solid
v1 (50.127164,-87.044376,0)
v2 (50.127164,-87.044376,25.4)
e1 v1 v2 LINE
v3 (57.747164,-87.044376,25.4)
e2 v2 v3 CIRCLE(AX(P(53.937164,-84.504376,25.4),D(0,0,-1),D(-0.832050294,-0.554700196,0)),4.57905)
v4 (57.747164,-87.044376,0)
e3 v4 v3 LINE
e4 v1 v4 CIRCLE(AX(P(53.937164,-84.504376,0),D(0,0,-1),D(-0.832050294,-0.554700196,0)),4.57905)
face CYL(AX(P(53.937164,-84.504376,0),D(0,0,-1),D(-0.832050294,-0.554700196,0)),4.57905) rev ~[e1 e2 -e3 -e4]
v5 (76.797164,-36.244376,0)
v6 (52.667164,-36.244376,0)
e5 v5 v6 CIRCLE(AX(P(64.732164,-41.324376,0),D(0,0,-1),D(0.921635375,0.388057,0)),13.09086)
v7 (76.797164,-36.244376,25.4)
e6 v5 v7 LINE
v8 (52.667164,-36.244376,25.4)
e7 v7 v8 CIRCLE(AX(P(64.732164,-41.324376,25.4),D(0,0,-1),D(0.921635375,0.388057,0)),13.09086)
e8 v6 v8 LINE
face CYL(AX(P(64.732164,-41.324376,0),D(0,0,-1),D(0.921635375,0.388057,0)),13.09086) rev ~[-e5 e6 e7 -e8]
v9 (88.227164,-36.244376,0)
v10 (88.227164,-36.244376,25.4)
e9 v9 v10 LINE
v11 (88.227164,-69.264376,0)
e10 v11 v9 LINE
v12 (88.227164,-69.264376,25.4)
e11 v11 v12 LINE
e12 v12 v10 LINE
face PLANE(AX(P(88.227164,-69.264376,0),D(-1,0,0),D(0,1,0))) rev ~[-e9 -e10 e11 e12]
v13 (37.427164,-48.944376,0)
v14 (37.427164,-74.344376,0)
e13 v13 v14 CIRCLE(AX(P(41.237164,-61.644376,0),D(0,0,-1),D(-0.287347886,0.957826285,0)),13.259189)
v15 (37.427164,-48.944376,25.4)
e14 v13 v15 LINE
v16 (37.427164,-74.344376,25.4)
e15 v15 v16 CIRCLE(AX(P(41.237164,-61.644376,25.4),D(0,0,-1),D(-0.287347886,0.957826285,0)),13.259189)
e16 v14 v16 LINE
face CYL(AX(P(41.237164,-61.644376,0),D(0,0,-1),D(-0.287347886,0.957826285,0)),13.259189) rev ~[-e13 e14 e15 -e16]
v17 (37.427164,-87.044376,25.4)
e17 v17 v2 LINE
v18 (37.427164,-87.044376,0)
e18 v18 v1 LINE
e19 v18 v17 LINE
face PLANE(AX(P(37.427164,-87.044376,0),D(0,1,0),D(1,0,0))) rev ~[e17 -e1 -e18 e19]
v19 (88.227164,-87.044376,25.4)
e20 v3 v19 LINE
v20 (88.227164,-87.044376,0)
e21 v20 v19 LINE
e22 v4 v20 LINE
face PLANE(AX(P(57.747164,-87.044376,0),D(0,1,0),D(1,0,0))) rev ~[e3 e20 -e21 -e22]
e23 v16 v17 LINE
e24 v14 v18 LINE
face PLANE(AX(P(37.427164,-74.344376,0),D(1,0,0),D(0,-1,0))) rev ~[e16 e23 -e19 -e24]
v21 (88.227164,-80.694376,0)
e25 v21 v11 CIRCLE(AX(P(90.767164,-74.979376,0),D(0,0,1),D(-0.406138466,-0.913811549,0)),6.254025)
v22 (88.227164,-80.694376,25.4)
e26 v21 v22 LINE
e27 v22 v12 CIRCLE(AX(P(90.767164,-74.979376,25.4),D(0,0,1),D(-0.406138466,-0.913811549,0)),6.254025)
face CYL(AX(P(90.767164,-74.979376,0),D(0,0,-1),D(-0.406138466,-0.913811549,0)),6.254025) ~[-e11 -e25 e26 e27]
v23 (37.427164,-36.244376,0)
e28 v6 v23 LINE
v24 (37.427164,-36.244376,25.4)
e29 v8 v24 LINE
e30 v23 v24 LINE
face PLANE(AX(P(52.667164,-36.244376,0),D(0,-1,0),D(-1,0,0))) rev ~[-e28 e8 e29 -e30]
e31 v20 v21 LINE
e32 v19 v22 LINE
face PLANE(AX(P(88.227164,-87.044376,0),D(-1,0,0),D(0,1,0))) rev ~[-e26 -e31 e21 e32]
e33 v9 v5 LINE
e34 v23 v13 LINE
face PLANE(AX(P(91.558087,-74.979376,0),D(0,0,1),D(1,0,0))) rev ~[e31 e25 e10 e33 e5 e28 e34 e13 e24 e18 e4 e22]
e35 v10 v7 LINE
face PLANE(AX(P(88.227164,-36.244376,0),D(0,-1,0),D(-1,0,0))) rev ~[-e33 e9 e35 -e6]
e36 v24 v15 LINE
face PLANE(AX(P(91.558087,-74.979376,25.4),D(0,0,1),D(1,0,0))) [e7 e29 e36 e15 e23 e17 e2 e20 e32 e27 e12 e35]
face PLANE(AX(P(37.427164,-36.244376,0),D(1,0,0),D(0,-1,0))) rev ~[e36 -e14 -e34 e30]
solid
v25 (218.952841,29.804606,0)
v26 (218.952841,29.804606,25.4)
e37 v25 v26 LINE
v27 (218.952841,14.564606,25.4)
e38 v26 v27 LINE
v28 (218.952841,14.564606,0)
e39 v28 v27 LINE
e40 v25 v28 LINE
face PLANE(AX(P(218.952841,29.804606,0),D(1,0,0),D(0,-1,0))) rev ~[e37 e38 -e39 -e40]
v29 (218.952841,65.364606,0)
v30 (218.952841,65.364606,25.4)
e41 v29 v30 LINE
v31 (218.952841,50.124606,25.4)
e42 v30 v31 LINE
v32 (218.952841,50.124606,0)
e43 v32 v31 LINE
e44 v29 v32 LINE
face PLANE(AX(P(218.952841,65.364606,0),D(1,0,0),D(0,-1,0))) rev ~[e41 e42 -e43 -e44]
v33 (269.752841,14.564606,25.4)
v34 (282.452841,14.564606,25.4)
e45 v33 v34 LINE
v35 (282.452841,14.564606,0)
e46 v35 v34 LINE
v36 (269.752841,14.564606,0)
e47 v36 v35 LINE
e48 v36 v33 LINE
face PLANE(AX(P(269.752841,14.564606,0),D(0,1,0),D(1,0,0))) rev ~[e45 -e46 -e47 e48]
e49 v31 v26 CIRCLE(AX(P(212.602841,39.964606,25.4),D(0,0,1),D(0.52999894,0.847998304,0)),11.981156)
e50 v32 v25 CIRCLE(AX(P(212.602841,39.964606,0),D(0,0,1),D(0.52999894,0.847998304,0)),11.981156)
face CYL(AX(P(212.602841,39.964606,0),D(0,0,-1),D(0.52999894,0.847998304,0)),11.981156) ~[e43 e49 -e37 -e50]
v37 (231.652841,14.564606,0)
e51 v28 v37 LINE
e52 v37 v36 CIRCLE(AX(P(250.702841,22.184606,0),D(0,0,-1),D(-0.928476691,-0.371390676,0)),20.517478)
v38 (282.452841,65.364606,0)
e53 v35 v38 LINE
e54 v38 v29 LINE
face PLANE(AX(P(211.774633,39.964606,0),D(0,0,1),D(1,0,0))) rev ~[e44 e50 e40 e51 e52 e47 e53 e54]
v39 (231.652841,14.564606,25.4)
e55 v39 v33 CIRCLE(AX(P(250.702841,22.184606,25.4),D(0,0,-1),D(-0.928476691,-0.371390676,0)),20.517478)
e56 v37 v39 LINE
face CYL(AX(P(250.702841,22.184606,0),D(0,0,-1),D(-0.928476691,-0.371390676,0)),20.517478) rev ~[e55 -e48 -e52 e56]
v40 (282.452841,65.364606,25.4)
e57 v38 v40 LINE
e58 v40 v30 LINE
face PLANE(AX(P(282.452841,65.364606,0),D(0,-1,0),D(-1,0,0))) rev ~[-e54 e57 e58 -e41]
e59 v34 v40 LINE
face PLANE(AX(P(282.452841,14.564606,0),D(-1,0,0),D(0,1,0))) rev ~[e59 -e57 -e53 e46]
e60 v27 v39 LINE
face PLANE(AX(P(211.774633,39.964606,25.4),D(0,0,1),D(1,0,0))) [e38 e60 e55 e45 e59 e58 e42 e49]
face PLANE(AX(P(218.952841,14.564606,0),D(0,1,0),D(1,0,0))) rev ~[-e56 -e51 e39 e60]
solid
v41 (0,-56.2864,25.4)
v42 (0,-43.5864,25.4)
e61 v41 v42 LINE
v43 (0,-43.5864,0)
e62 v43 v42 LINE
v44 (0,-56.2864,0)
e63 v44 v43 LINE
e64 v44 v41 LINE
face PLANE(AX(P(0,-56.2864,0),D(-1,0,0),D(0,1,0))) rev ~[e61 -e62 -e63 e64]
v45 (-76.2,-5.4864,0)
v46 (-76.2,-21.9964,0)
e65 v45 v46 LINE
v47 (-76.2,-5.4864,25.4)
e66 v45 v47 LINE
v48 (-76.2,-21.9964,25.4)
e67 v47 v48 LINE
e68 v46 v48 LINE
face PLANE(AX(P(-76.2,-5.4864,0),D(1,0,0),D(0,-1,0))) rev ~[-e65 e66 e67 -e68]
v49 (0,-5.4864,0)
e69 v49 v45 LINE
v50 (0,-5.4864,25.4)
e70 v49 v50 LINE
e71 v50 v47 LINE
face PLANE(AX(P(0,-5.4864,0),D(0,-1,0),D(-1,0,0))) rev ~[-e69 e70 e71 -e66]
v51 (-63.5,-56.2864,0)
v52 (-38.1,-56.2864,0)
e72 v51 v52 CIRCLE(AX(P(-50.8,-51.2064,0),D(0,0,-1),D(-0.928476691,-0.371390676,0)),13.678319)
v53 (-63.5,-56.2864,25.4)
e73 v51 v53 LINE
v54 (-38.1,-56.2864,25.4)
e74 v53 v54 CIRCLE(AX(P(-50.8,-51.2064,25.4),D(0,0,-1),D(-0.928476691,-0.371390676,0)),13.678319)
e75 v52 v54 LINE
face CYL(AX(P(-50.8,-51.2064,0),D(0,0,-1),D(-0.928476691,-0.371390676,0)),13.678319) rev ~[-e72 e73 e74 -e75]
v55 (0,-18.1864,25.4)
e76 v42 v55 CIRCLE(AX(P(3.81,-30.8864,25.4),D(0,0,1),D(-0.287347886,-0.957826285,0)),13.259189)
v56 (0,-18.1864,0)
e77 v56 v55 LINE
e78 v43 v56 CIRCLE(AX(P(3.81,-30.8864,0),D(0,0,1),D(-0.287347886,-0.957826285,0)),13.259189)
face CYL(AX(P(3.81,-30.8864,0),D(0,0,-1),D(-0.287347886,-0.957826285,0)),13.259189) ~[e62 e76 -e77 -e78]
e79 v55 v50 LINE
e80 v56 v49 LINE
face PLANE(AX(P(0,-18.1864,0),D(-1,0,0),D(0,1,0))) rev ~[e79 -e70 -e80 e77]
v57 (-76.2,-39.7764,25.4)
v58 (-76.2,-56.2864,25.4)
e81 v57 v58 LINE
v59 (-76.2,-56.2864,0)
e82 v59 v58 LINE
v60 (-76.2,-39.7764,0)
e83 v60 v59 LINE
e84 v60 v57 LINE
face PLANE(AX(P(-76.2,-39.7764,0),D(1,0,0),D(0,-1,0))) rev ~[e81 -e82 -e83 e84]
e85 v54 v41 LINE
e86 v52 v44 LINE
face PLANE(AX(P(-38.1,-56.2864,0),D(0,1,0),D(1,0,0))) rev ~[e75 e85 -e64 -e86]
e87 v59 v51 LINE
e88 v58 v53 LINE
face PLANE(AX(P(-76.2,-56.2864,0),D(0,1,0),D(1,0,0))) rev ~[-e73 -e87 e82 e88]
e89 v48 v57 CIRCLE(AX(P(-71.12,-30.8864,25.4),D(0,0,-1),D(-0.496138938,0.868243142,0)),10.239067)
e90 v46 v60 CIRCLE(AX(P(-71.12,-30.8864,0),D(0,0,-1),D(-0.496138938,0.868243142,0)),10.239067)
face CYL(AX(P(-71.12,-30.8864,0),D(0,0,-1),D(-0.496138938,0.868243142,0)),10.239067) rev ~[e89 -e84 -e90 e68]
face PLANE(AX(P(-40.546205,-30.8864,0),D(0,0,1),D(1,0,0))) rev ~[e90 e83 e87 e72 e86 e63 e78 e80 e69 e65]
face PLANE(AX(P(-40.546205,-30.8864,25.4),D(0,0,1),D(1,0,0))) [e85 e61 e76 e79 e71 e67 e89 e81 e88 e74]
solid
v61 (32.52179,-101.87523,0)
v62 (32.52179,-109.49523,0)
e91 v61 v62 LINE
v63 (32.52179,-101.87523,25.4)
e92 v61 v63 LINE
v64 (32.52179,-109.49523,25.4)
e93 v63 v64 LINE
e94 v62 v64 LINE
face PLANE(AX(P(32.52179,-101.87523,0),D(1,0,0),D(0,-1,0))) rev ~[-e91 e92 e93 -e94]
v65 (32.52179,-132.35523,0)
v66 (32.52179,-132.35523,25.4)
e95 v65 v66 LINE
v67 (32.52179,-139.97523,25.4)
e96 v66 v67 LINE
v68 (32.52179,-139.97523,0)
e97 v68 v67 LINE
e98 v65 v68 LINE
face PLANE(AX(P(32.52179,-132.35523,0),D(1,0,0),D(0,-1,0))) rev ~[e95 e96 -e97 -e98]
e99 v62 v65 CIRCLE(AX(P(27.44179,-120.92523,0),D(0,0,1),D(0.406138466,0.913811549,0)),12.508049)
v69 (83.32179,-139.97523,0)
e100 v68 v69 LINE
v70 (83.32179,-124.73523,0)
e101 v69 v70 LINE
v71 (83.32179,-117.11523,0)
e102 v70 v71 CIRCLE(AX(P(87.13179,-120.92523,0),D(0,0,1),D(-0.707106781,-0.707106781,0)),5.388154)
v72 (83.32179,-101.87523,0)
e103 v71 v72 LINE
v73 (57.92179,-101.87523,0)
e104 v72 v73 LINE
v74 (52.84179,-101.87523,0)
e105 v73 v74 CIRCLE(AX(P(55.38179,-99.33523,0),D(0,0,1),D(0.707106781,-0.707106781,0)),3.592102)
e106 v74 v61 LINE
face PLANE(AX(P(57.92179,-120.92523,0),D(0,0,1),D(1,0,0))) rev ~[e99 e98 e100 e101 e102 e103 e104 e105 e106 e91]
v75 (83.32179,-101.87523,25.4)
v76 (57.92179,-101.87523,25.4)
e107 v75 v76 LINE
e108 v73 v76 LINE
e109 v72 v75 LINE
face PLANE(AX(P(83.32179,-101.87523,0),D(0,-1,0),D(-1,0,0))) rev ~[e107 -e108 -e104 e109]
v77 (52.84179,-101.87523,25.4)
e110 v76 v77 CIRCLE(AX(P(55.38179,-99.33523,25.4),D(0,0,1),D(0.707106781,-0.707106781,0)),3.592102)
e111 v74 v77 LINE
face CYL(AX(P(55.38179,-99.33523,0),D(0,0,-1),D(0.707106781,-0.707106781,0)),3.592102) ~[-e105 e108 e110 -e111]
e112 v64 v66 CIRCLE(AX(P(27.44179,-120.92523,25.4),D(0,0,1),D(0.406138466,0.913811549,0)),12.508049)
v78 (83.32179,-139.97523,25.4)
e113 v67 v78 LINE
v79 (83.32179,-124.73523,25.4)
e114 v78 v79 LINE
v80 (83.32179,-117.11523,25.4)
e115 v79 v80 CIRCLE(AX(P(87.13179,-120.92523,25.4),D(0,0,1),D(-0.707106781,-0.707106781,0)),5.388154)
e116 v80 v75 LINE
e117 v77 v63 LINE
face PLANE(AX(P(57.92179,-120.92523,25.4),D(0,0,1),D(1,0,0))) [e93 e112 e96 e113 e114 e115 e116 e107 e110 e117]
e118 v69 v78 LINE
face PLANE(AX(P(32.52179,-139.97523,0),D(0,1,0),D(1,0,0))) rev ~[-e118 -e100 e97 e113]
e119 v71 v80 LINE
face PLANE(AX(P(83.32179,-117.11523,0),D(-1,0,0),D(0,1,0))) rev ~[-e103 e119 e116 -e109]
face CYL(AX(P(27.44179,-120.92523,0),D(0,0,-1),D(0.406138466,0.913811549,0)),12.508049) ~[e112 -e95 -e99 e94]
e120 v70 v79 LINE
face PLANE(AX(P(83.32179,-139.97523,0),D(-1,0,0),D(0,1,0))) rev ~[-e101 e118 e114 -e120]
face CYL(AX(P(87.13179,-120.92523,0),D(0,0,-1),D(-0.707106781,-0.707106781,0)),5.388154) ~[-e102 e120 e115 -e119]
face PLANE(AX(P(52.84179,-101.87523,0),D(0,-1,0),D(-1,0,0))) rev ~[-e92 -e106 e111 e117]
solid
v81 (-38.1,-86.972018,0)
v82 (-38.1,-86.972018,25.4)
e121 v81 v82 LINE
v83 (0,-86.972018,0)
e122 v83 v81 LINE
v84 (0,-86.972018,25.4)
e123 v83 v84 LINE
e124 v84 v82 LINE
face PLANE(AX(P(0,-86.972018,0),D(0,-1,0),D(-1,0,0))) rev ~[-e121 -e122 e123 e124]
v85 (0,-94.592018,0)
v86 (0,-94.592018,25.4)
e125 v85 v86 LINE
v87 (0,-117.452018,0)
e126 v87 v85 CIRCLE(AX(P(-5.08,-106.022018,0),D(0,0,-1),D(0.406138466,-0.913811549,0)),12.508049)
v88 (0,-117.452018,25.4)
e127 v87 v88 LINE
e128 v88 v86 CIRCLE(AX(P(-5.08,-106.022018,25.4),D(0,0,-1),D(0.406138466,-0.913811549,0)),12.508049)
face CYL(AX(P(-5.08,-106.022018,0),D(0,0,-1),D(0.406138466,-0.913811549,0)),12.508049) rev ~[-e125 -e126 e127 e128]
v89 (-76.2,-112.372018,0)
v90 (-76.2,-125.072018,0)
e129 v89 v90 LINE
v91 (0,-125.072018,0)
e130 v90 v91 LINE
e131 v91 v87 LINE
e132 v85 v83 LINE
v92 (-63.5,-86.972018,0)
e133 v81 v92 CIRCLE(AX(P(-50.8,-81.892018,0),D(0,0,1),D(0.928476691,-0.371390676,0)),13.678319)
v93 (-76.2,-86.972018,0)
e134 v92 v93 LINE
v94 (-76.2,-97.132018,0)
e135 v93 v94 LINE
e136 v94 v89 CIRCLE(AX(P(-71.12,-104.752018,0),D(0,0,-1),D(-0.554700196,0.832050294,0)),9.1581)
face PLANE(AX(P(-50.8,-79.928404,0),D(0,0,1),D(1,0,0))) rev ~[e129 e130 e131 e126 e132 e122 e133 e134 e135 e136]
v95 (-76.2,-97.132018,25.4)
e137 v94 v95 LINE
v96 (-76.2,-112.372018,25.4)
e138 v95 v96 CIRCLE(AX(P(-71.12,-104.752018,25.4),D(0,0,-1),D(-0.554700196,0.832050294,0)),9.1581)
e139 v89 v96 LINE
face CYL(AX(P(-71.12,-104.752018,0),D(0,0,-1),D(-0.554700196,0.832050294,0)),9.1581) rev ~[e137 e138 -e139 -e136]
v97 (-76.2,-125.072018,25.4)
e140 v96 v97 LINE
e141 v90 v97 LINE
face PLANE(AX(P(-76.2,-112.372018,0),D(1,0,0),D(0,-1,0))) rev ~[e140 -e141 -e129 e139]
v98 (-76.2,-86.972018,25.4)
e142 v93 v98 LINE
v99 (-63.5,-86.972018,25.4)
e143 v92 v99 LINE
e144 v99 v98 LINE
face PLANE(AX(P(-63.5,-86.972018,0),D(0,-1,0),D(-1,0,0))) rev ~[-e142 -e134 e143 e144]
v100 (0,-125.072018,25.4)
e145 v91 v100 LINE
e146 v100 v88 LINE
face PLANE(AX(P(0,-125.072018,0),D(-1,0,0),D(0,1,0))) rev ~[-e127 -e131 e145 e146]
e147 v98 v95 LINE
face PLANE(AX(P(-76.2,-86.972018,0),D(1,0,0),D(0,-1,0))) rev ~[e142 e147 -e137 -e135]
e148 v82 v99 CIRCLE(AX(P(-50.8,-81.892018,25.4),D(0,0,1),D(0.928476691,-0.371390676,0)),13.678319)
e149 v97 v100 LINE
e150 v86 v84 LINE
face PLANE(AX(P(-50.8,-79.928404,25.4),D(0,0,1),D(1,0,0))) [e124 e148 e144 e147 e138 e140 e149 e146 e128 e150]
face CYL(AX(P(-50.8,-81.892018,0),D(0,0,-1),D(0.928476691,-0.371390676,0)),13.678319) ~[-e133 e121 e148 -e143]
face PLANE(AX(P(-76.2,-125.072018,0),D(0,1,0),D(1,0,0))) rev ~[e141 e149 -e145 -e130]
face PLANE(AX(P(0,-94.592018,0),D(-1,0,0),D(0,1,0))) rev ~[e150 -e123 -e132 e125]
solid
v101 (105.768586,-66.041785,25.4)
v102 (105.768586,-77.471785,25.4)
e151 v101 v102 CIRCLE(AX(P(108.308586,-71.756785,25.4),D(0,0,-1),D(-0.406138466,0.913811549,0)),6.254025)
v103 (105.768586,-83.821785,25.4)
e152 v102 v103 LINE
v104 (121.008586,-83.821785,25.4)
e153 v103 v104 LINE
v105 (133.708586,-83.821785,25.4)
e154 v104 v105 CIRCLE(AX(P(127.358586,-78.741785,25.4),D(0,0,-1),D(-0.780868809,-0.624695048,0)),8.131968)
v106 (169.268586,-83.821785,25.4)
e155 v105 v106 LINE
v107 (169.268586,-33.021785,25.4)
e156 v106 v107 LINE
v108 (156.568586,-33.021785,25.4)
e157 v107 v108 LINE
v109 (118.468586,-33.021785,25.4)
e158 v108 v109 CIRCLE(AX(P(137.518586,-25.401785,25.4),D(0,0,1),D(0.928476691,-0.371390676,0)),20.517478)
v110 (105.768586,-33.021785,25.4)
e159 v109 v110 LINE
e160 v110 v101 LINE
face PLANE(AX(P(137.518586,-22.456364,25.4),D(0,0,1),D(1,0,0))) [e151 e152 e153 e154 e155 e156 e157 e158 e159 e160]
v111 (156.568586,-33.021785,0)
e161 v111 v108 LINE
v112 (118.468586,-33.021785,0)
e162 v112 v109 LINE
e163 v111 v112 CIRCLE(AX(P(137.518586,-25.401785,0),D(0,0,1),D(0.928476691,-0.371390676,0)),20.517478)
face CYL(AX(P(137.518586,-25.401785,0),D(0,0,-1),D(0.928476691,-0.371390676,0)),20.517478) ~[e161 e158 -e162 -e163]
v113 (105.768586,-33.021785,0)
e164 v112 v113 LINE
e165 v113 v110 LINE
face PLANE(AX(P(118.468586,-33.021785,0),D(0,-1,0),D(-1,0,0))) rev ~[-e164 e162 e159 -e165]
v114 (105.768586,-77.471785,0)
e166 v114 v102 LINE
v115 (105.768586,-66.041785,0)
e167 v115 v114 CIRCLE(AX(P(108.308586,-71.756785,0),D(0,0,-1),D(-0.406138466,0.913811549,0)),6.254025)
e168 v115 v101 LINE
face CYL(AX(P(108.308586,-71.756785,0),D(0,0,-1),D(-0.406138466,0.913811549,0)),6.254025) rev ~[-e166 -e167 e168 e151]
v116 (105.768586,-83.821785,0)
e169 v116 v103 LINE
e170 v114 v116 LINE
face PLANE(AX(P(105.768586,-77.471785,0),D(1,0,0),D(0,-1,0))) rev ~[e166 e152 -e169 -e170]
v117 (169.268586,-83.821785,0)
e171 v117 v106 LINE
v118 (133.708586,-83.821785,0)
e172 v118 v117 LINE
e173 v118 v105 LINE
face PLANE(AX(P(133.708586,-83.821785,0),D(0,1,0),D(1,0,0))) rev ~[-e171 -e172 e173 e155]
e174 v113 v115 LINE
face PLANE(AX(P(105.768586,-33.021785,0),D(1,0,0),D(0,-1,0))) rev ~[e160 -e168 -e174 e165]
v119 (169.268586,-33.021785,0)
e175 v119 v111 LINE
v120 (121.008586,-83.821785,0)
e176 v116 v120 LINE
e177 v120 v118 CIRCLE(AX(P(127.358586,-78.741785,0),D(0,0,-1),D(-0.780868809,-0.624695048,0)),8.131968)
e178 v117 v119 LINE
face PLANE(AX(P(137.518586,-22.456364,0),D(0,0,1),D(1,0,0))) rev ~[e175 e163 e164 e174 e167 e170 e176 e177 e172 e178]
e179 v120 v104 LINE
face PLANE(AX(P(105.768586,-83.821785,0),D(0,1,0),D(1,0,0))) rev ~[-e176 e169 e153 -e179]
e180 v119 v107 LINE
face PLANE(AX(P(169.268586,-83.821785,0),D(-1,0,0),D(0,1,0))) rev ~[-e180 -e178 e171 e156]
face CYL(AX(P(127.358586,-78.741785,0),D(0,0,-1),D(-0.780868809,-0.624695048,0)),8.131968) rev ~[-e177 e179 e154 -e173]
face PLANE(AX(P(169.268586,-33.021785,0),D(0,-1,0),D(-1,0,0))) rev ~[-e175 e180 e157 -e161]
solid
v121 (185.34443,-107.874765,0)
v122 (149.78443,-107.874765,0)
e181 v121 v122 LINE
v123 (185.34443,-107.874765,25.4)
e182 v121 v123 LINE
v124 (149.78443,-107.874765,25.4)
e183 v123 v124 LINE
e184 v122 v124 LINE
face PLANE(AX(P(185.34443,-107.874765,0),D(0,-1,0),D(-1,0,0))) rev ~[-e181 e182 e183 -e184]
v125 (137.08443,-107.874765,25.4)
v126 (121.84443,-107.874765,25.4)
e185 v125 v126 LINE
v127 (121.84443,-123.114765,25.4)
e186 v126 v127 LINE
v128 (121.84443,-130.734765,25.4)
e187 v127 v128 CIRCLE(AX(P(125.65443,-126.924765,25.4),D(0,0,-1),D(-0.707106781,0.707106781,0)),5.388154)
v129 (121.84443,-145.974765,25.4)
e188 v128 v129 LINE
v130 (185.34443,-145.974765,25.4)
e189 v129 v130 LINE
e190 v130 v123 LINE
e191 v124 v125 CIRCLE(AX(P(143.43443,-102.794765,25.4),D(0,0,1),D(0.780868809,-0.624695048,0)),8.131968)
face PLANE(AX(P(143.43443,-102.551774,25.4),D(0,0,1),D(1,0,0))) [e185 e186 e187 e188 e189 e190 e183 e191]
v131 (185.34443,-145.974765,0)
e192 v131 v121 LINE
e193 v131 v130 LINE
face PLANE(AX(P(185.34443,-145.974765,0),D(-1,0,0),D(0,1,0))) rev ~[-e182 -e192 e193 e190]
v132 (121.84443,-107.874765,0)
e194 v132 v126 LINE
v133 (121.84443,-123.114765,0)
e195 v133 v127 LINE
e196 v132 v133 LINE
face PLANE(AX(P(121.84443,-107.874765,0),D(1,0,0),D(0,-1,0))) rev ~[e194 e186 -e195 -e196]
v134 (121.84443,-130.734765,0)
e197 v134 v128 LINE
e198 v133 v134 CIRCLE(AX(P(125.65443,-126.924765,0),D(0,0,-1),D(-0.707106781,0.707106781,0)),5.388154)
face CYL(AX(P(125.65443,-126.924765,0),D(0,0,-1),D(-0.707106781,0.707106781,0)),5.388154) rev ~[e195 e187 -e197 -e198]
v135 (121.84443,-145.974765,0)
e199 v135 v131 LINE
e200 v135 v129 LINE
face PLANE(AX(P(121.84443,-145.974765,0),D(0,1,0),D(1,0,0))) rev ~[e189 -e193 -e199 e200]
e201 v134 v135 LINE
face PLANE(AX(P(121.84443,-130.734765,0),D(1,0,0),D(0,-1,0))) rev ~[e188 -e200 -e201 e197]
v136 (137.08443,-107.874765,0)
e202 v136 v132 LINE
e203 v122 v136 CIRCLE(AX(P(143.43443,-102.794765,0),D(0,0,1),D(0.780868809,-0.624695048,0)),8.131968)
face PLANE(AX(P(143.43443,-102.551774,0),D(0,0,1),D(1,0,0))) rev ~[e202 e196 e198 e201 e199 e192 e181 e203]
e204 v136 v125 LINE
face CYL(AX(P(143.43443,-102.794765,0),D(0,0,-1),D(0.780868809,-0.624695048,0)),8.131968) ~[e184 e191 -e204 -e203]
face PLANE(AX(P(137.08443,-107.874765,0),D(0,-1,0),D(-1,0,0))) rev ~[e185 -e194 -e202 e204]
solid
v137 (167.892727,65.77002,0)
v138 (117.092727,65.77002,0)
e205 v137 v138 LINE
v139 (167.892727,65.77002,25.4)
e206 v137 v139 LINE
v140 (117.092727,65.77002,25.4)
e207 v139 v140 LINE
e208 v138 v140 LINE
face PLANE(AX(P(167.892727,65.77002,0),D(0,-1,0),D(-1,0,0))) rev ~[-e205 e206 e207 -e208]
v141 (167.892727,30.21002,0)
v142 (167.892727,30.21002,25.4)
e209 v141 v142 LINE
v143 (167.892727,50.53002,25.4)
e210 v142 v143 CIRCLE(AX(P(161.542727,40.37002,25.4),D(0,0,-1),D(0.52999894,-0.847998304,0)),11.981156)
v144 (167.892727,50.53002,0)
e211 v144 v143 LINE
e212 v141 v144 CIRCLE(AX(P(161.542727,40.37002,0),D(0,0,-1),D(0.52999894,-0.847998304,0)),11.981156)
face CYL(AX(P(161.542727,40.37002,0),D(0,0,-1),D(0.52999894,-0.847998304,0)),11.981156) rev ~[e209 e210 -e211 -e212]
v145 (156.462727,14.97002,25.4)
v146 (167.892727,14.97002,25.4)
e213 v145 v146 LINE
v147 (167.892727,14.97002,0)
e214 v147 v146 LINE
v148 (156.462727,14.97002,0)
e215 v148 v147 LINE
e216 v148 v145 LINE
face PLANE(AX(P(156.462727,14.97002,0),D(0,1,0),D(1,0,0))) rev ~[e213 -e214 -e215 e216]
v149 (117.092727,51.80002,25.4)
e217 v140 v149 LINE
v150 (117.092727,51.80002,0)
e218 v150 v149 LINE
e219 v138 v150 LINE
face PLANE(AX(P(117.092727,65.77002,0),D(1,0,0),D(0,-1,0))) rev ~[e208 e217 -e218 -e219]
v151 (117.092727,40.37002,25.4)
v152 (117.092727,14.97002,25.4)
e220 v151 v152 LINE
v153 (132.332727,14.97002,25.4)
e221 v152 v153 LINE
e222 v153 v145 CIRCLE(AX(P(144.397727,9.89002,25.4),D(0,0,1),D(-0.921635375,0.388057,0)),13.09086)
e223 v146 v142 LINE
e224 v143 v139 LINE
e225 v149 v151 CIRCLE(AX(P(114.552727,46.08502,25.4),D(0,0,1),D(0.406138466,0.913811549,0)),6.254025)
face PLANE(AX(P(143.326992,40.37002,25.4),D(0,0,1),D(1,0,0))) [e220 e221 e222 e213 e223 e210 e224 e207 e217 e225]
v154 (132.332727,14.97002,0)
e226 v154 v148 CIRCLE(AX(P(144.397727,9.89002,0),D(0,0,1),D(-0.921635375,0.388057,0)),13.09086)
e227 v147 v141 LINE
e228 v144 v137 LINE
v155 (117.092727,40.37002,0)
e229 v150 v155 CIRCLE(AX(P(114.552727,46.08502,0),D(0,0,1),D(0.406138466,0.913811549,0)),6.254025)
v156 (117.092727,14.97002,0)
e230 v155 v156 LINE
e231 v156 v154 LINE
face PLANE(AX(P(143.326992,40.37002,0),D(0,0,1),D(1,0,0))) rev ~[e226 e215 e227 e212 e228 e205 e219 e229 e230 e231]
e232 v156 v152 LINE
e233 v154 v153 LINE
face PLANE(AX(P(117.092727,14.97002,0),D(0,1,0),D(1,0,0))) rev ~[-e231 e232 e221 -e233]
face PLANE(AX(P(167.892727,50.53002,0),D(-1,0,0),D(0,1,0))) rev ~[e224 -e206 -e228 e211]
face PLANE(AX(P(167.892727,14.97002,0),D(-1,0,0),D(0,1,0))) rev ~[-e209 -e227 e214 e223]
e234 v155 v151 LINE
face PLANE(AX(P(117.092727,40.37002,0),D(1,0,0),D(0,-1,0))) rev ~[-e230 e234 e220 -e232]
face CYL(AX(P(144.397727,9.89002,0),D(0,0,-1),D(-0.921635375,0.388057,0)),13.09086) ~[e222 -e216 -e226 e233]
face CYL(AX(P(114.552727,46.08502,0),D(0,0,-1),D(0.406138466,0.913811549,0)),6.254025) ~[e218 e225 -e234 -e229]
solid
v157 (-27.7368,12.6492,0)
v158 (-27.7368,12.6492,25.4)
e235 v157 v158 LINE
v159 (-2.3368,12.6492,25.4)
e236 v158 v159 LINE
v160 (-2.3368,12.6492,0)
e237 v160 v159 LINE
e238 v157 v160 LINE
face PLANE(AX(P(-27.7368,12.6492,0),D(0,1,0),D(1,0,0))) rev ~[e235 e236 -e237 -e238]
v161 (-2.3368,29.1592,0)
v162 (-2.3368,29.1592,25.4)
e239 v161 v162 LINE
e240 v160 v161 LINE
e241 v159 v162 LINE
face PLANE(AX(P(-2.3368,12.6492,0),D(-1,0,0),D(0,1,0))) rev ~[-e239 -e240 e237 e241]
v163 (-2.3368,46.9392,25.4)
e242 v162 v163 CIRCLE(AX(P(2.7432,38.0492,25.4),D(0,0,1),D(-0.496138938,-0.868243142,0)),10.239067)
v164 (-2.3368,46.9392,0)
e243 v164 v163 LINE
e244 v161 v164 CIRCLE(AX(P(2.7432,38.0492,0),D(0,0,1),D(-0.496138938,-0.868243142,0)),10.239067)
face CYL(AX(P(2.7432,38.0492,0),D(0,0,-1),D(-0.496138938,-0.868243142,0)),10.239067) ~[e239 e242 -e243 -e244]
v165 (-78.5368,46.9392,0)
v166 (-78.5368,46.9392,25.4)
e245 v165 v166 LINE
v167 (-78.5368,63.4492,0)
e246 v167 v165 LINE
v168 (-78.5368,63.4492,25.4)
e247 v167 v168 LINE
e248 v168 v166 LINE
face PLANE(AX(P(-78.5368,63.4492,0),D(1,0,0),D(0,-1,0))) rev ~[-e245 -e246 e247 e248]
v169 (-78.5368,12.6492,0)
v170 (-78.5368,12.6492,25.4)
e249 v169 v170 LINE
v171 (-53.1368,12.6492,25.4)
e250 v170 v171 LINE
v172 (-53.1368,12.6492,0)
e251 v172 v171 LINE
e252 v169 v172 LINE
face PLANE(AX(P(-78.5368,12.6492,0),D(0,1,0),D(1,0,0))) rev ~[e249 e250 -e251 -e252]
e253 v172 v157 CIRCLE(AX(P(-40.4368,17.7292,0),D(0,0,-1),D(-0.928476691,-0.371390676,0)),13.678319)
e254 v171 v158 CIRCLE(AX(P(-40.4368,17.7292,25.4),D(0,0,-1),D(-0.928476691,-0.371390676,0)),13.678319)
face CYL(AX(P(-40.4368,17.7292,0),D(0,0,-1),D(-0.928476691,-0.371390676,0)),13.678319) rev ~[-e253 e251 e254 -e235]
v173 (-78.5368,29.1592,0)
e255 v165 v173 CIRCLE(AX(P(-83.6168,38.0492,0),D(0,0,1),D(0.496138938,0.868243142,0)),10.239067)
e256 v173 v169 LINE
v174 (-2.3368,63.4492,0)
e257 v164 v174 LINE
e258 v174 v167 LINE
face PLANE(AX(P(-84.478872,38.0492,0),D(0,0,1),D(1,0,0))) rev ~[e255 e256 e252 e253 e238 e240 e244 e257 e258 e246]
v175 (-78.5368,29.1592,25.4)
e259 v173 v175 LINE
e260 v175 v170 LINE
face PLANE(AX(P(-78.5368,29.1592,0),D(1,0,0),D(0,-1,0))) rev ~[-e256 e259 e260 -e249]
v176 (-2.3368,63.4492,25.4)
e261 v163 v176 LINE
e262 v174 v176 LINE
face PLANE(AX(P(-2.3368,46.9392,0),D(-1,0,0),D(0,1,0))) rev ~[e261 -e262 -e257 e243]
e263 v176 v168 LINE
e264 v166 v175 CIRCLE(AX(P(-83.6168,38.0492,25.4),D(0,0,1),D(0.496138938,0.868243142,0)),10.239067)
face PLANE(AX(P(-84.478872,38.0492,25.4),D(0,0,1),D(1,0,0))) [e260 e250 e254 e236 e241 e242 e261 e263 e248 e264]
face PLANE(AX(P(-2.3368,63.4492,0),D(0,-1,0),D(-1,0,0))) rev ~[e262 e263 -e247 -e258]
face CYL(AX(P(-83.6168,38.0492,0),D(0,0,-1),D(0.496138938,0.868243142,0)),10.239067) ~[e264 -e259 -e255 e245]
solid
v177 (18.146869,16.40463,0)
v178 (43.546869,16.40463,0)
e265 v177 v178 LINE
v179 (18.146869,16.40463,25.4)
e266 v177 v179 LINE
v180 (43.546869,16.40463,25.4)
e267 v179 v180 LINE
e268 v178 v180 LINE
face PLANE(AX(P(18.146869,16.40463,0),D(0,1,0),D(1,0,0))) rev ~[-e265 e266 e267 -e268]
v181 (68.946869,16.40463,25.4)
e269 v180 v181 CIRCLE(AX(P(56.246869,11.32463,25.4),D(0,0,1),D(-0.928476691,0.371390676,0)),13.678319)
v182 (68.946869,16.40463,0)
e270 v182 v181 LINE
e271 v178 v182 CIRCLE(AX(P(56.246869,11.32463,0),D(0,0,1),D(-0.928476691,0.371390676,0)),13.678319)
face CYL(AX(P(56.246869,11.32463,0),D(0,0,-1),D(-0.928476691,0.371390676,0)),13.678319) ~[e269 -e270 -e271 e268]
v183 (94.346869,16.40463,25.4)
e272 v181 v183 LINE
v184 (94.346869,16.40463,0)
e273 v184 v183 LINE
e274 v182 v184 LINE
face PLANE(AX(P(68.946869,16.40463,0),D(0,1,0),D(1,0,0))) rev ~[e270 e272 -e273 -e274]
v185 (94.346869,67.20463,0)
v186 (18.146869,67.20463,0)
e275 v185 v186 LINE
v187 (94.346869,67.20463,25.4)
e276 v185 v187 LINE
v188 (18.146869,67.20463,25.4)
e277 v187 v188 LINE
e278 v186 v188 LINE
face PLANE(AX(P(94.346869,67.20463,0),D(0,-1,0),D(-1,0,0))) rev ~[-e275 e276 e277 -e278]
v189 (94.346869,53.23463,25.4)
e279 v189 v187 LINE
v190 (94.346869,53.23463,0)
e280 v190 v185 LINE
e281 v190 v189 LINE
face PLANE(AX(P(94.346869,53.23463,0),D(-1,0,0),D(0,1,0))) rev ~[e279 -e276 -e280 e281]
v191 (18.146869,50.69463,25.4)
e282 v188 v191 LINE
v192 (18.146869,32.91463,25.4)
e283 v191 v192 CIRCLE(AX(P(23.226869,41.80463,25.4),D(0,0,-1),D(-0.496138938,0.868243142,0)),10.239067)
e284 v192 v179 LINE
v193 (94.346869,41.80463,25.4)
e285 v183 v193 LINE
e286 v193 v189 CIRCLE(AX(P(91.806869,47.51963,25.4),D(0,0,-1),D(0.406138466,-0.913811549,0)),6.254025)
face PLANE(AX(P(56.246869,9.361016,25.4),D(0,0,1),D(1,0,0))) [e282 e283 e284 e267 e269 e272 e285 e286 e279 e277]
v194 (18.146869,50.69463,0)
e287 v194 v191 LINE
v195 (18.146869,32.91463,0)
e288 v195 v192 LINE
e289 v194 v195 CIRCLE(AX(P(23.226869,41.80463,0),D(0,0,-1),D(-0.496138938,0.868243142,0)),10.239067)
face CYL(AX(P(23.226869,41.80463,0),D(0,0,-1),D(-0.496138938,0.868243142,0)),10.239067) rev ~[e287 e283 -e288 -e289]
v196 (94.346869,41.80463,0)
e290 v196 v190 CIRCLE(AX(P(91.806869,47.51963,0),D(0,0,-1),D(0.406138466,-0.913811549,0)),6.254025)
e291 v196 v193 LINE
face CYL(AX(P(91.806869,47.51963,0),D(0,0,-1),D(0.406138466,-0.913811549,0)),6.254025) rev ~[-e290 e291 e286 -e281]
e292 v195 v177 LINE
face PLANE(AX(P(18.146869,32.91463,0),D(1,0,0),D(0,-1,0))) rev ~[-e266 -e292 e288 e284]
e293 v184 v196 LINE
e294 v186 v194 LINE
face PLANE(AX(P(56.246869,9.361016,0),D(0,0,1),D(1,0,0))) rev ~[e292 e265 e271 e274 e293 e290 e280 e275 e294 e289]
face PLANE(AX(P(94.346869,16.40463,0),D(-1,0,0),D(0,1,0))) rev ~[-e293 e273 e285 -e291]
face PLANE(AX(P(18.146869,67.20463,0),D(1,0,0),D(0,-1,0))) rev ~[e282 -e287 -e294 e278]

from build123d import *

# Parameters (mm, degrees)
F1_DEPTH  = 25.4
F3_DEPTH  = 25.4
F5_DEPTH  = 25.4
F7_DEPTH  = 25.4
F9_DEPTH  = 25.4
F11_DEPTH = 25.4
F13_DEPTH = 25.4
F15_DEPTH = 25.4
F17_DEPTH = 25.4
F19_DEPTH = 25.4


# Not quite as in the source:
# - a feature names something its author has since deleted; it is built from what else it names


with BuildPart() as f1:
    # F0 (on Top) → F1 (new body)
    with BuildSketch(Plane.XY):
        with BuildLine():
            Line((-78.5367997915, 29.1591999254), (-78.5367997915, 46.9391999254))
            ThreePointArc((-78.5367997915, 46.9391999254), (-93.8558671318, 38.0491999254), (-78.5367997915, 29.1591999254))
        make_face()
        with BuildLine():
            Line((-2.3367997915, 63.4491999254), (-78.5367997915, 63.4491999254))
            Line((-78.5367997915, 63.4491999254), (-78.5367997915, 46.9391999254))
            Line((-78.5367997915, 46.9391999254), (-78.5367997915, 29.1591999254))
            Line((-78.5367997915, 29.1591999254), (-78.5367997915, 12.6491999254))
            Line((-78.5367997915, 12.6491999254), (-53.1367997915, 12.6491999254))
            ThreePointArc((-53.1367997915, 12.6491999254), (-40.4367997915, 31.4075185355), (-27.7367997915, 12.6491999254))
            Line((-27.7367997915, 12.6491999254), (-2.3367997915, 12.6491999254))
            Line((-2.3367997915, 12.6491999254), (-2.3367997915, 29.1591999254))
            Line((-2.3367997915, 29.1591999254), (-2.3367997915, 46.9391999254))
            Line((-2.3367997915, 46.9391999254), (-2.3367997915, 63.4491999254))
        make_face()
        with BuildLine():
            ThreePointArc((-2.3367997915, 29.1591999254), (12.9822675489, 38.0491999254), (-2.3367997915, 46.9391999254))
            Line((-2.3367997915, 46.9391999254), (-2.3367997915, 29.1591999254))
        make_face()
    extrude(amount=F1_DEPTH)


with BuildPart() as f3:
    # F2 (on Top) → F3 (new body)
    with BuildSketch(Plane.XY):
        with BuildLine():
            Line((68.946869266, 16.4046303093), (43.546869266, 16.4046303093))
            ThreePointArc((43.546869266, 16.4046303093), (56.246869266, -2.3536883008), (68.946869266, 16.4046303093))
        make_face()
        with BuildLine():
            Line((94.346869266, 67.2046303093), (18.146869266, 67.2046303093))
            Line((18.146869266, 67.2046303093), (18.146869266, 50.6946303093))
            ThreePointArc((18.146869266, 50.6946303093), (33.4659366064, 41.8046303093), (18.146869266, 32.9146303093))
            Line((18.146869266, 32.9146303093), (18.146869266, 16.4046303093))
            Line((18.146869266, 16.4046303093), (43.546869266, 16.4046303093))
            Line((43.546869266, 16.4046303093), (68.946869266, 16.4046303093))
            Line((68.946869266, 16.4046303093), (94.346869266, 16.4046303093))
            Line((94.346869266, 16.4046303093), (94.346869266, 41.8046303093))
            ThreePointArc((94.346869266, 41.8046303093), (85.5528445619, 47.5196303093), (94.346869266, 53.2346303093))
            Line((94.346869266, 53.2346303093), (94.346869266, 67.2046303093))
        make_face()
    extrude(amount=F3_DEPTH)


with BuildPart() as f5:
    # F4 (on Top) → F5 (new body)
    with BuildSketch(Plane.XY):
        with BuildLine():
            Line((-50.8, -5.4863997316), (-76.2, -5.4863997316))
            Line((-76.2, -5.4863997316), (-76.2, -21.9963997316))
            ThreePointArc((-76.2, -21.9963997316), (-60.8809326597, -30.8863997316), (-76.2, -39.7763997316))
            Line((-76.2, -39.7763997316), (-76.2, -56.2863997316))
            Line((-76.2, -56.2863997316), (-63.5, -56.2863997316))
            ThreePointArc((-63.5, -56.2863997316), (-50.8, -37.5280811215), (-38.1, -56.2863997316))
            Line((-38.1, -56.2863997316), (0, -56.2863997316))
            Line((0, -56.2863997316), (0, -43.5863997316))
            Line((0, -43.5863997316), (0, -18.1863997316))
            Line((0, -18.1863997316), (0, -5.4863997316))
            Line((0, -5.4863997316), (-25.4, -5.4863997316))
            ThreePointArc((-25.4, -5.4863997316), (-38.1, -24.2447183418), (-50.8, -5.4863997316))
        make_face()
        with BuildLine():
            Line((-25.4, -5.4863997316), (-50.8, -5.4863997316))
            ThreePointArc((-50.8, -5.4863997316), (-38.1, -24.2447183418), (-25.4, -5.4863997316))
        make_face()
        with BuildLine():
            ThreePointArc((0, -43.5863997316), (17.0691892663, -30.8863997316), (0, -18.1863997316))
            Line((0, -18.1863997316), (0, -43.5863997316))
        make_face()
    extrude(amount=F5_DEPTH)


with BuildPart() as f7:
    # F6 (on Top) → F7 (new body)
    with BuildSketch(Plane.XY):
        with BuildLine():
            ThreePointArc((88.2271643072, -80.6943764091), (97.0211890114, -74.9793764091), (88.2271643072, -69.2643764091))
            Line((88.2271643072, -69.2643764091), (88.2271643072, -80.6943764091))
        make_face()
        with BuildLine():
            Line((52.6671643072, -36.2443764091), (37.4271643072, -36.2443764091))
            Line((37.4271643072, -36.2443764091), (37.4271643072, -48.9443764091))
            ThreePointArc((37.4271643072, -48.9443764091), (54.4963535736, -61.6443764091), (37.4271643072, -74.3443764091))
            Line((37.4271643072, -74.3443764091), (37.4271643072, -87.0443764091))
            Line((37.4271643072, -87.0443764091), (50.1271643072, -87.0443764091))
            ThreePointArc((50.1271643072, -87.0443764091), (53.9371643072, -79.9253262892), (57.7471643072, -87.0443764091))
            Line((57.7471643072, -87.0443764091), (88.2271643072, -87.0443764091))
            Line((88.2271643072, -87.0443764091), (88.2271643072, -80.6943764091))
            Line((88.2271643072, -80.6943764091), (88.2271643072, -69.2643764091))
            Line((88.2271643072, -69.2643764091), (88.2271643072, -36.2443764091))
            Line((88.2271643072, -36.2443764091), (76.7971643072, -36.2443764091))
            ThreePointArc((76.7971643072, -36.2443764091), (64.7321643072, -54.4152367704), (52.6671643072, -36.2443764091))
        make_face()
    extrude(amount=F7_DEPTH)


with BuildPart() as f9:
    # F8 (on Top) → F9 (new body)
    with BuildSketch(Plane.XY):
        with BuildLine():
            Line((117.092727313, 40.3700199814), (117.092727313, 14.9700199814))
            Line((117.092727313, 14.9700199814), (132.332727313, 14.9700199814))
            Line((132.332727313, 14.9700199814), (156.462727313, 14.9700199814))
            Line((156.462727313, 14.9700199814), (167.892727313, 14.9700199814))
            Line((167.892727313, 14.9700199814), (167.892727313, 30.2100199814))
            ThreePointArc((167.892727313, 30.2100199814), (149.5615712753, 40.3700199814), (167.892727313, 50.5300199814))
            Line((167.892727313, 50.5300199814), (167.892727313, 65.7700199814))
            Line((167.892727313, 65.7700199814), (117.092727313, 65.7700199814))
            Line((117.092727313, 65.7700199814), (117.092727313, 51.8000199814))
            Line((117.092727313, 51.8000199814), (117.092727313, 40.3700199814))
        make_face()
        with BuildLine():
            Line((156.462727313, 14.9700199814), (132.332727313, 14.9700199814))
            ThreePointArc((132.332727313, 14.9700199814), (144.397727313, -3.2008403799), (156.462727313, 14.9700199814))
        make_face()
        with BuildLine():
            ThreePointArc((117.092727313, 51.8000199814), (108.2987026089, 46.0850199814), (117.092727313, 40.3700199814))
            Line((117.092727313, 40.3700199814), (117.092727313, 51.8000199814))
        make_face()
    extrude(amount=F9_DEPTH)


with BuildPart() as f11:
    # F10 (on Top) → F11 (new body)
    with BuildSketch(Plane.XY):
        with BuildLine():
            Line((218.9528409719, 29.8046059906), (218.9528409719, 50.1246059906))
            ThreePointArc((218.9528409719, 50.1246059906), (200.6216849342, 39.9646059906), (218.9528409719, 29.8046059906))
        make_face()
        with BuildLine():
            Line((282.4528409719, 65.3646059906), (218.9528409719, 65.3646059906))
            Line((218.9528409719, 65.3646059906), (218.9528409719, 50.1246059906))
            Line((218.9528409719, 50.1246059906), (218.9528409719, 29.8046059906))
            Line((218.9528409719, 29.8046059906), (218.9528409719, 14.5646059906))
            Line((218.9528409719, 14.5646059906), (231.6528409719, 14.5646059906))
            ThreePointArc((231.6528409719, 14.5646059906), (250.7028409719, 42.7020839058), (269.7528409719, 14.5646059906))
            Line((269.7528409719, 14.5646059906), (282.4528409719, 14.5646059906))
            Line((282.4528409719, 14.5646059906), (282.4528409719, 65.3646059906))
        make_face()
    extrude(amount=F11_DEPTH)


with BuildPart() as f13:
    # F12 (on Top) → F13 (new body)
    with BuildSketch(Plane.XY):
        with BuildLine():
            ThreePointArc((156.5685857674, -33.0217852473), (137.5185857674, -4.8843073321), (118.4685857674, -33.0217852473))
            Line((118.4685857674, -33.0217852473), (156.5685857674, -33.0217852473))
        make_face()
        with BuildLine():
            Line((118.4685857674, -33.0217852473), (105.7685857674, -33.0217852473))
            Line((105.7685857674, -33.0217852473), (105.7685857674, -66.0417852473))
            ThreePointArc((105.7685857674, -66.0417852473), (114.5626104715, -71.7567852473), (105.7685857674, -77.4717852473))
            Line((105.7685857674, -77.4717852473), (105.7685857674, -83.8217852473))
            Line((105.7685857674, -83.8217852473), (121.0085857674, -83.8217852473))
            ThreePointArc((121.0085857674, -83.8217852473), (127.3585857674, -70.6098174658), (133.7085857674, -83.8217852473))
            Line((133.7085857674, -83.8217852473), (169.2685857674, -83.8217852473))
            Line((169.2685857674, -83.8217852473), (169.2685857674, -33.0217852473))
            Line((169.2685857674, -33.0217852473), (156.5685857674, -33.0217852473))
            Line((156.5685857674, -33.0217852473), (118.4685857674, -33.0217852473))
        make_face()
    extrude(amount=F13_DEPTH)


with BuildPart() as f15:
    # F14 (on Top) → F15 (new body)
    with BuildSketch(Plane.XY):
        with BuildLine():
            ThreePointArc((-38.1, -86.9720183969), (-50.8, -68.2136997867), (-63.5, -86.9720183969))
            Line((-63.5, -86.9720183969), (-38.1, -86.9720183969))
        make_face()
        with BuildLine():
            Line((-63.5, -86.9720183969), (-76.2, -86.9720183969))
            Line((-76.2, -86.9720183969), (-76.2, -97.1320183969))
            ThreePointArc((-76.2, -97.1320183969), (-61.9618997603, -104.7520183969), (-76.2, -112.3720183969))
            Line((-76.2, -112.3720183969), (-76.2, -125.0720183969))
            Line((-76.2, -125.0720183969), (0, -125.0720183969))
            Line((0, -125.0720183969), (0, -117.4520183969))
            ThreePointArc((0, -117.4520183969), (-17.5880494083, -106.0220183969), (0, -94.5920183969))
            Line((0, -94.5920183969), (0, -86.9720183969))
            Line((0, -86.9720183969), (-38.1, -86.9720183969))
            Line((-38.1, -86.9720183969), (-63.5, -86.9720183969))
        make_face()
    extrude(amount=F15_DEPTH)


with BuildPart() as f17:
    # F16 (on Top) → F17 (new body)
    with BuildSketch(Plane.XY):
        Polygon((52.8417903644, -101.8752300191), (32.5217903644, -101.8752300191), (32.5217903644, -109.4952300191), (32.5217903644, -132.3552300191), (32.5217903644, -139.9752300191), (83.3217903644, -139.9752300191), (83.3217903644, -124.7352300191), (83.3217903644, -117.1152300191), (83.3217903644, -101.8752300191), (57.9217903644, -101.8752300191), align=None)
        with BuildLine():
            ThreePointArc((57.9217903644, -101.8752300191), (55.3817903644, -95.7431275707), (52.8417903644, -101.8752300191))
            Line((52.8417903644, -101.8752300191), (57.9217903644, -101.8752300191))
        make_face()
        with BuildLine():
            Line((32.5217903644, -132.3552300191), (32.5217903644, -109.4952300191))
            ThreePointArc((32.5217903644, -109.4952300191), (14.9337409561, -120.9252300191), (32.5217903644, -132.3552300191))
        make_face()
        with BuildLine():
            ThreePointArc((83.3217903644, -124.7352300191), (92.519944037, -120.9252300191), (83.3217903644, -117.1152300191))
            Line((83.3217903644, -117.1152300191), (83.3217903644, -124.7352300191))
        make_face()
    extrude(amount=F17_DEPTH)


with BuildPart() as f19:
    # F18 (on Top) → F19 (new body)
    with BuildSketch(Plane.XY):
        with BuildLine():
            ThreePointArc((149.7844299936, -107.8747646904), (143.4344299936, -94.6627969089), (137.0844299936, -107.8747646904))
            Line((137.0844299936, -107.8747646904), (149.7844299936, -107.8747646904))
        make_face()
        with BuildLine():
            Line((137.0844299936, -107.8747646904), (121.8444299936, -107.8747646904))
            Line((121.8444299936, -107.8747646904), (121.8444299936, -123.1147646904))
            ThreePointArc((121.8444299936, -123.1147646904), (131.0425836663, -126.9247646904), (121.8444299936, -130.7347646904))
            Line((121.8444299936, -130.7347646904), (121.8444299936, -145.9747646904))
            Line((121.8444299936, -145.9747646904), (185.3444299936, -145.9747646904))
            Line((185.3444299936, -145.9747646904), (185.3444299936, -107.8747646904))
            Line((185.3444299936, -107.8747646904), (149.7844299936, -107.8747646904))
            Line((149.7844299936, -107.8747646904), (137.0844299936, -107.8747646904))
        make_face()
    extrude(amount=F19_DEPTH)


solid = Compound([f1.part, f3.part, f5.part, f7.part, f9.part, f11.part, f13.part, f15.part, f17.part, f19.part])
